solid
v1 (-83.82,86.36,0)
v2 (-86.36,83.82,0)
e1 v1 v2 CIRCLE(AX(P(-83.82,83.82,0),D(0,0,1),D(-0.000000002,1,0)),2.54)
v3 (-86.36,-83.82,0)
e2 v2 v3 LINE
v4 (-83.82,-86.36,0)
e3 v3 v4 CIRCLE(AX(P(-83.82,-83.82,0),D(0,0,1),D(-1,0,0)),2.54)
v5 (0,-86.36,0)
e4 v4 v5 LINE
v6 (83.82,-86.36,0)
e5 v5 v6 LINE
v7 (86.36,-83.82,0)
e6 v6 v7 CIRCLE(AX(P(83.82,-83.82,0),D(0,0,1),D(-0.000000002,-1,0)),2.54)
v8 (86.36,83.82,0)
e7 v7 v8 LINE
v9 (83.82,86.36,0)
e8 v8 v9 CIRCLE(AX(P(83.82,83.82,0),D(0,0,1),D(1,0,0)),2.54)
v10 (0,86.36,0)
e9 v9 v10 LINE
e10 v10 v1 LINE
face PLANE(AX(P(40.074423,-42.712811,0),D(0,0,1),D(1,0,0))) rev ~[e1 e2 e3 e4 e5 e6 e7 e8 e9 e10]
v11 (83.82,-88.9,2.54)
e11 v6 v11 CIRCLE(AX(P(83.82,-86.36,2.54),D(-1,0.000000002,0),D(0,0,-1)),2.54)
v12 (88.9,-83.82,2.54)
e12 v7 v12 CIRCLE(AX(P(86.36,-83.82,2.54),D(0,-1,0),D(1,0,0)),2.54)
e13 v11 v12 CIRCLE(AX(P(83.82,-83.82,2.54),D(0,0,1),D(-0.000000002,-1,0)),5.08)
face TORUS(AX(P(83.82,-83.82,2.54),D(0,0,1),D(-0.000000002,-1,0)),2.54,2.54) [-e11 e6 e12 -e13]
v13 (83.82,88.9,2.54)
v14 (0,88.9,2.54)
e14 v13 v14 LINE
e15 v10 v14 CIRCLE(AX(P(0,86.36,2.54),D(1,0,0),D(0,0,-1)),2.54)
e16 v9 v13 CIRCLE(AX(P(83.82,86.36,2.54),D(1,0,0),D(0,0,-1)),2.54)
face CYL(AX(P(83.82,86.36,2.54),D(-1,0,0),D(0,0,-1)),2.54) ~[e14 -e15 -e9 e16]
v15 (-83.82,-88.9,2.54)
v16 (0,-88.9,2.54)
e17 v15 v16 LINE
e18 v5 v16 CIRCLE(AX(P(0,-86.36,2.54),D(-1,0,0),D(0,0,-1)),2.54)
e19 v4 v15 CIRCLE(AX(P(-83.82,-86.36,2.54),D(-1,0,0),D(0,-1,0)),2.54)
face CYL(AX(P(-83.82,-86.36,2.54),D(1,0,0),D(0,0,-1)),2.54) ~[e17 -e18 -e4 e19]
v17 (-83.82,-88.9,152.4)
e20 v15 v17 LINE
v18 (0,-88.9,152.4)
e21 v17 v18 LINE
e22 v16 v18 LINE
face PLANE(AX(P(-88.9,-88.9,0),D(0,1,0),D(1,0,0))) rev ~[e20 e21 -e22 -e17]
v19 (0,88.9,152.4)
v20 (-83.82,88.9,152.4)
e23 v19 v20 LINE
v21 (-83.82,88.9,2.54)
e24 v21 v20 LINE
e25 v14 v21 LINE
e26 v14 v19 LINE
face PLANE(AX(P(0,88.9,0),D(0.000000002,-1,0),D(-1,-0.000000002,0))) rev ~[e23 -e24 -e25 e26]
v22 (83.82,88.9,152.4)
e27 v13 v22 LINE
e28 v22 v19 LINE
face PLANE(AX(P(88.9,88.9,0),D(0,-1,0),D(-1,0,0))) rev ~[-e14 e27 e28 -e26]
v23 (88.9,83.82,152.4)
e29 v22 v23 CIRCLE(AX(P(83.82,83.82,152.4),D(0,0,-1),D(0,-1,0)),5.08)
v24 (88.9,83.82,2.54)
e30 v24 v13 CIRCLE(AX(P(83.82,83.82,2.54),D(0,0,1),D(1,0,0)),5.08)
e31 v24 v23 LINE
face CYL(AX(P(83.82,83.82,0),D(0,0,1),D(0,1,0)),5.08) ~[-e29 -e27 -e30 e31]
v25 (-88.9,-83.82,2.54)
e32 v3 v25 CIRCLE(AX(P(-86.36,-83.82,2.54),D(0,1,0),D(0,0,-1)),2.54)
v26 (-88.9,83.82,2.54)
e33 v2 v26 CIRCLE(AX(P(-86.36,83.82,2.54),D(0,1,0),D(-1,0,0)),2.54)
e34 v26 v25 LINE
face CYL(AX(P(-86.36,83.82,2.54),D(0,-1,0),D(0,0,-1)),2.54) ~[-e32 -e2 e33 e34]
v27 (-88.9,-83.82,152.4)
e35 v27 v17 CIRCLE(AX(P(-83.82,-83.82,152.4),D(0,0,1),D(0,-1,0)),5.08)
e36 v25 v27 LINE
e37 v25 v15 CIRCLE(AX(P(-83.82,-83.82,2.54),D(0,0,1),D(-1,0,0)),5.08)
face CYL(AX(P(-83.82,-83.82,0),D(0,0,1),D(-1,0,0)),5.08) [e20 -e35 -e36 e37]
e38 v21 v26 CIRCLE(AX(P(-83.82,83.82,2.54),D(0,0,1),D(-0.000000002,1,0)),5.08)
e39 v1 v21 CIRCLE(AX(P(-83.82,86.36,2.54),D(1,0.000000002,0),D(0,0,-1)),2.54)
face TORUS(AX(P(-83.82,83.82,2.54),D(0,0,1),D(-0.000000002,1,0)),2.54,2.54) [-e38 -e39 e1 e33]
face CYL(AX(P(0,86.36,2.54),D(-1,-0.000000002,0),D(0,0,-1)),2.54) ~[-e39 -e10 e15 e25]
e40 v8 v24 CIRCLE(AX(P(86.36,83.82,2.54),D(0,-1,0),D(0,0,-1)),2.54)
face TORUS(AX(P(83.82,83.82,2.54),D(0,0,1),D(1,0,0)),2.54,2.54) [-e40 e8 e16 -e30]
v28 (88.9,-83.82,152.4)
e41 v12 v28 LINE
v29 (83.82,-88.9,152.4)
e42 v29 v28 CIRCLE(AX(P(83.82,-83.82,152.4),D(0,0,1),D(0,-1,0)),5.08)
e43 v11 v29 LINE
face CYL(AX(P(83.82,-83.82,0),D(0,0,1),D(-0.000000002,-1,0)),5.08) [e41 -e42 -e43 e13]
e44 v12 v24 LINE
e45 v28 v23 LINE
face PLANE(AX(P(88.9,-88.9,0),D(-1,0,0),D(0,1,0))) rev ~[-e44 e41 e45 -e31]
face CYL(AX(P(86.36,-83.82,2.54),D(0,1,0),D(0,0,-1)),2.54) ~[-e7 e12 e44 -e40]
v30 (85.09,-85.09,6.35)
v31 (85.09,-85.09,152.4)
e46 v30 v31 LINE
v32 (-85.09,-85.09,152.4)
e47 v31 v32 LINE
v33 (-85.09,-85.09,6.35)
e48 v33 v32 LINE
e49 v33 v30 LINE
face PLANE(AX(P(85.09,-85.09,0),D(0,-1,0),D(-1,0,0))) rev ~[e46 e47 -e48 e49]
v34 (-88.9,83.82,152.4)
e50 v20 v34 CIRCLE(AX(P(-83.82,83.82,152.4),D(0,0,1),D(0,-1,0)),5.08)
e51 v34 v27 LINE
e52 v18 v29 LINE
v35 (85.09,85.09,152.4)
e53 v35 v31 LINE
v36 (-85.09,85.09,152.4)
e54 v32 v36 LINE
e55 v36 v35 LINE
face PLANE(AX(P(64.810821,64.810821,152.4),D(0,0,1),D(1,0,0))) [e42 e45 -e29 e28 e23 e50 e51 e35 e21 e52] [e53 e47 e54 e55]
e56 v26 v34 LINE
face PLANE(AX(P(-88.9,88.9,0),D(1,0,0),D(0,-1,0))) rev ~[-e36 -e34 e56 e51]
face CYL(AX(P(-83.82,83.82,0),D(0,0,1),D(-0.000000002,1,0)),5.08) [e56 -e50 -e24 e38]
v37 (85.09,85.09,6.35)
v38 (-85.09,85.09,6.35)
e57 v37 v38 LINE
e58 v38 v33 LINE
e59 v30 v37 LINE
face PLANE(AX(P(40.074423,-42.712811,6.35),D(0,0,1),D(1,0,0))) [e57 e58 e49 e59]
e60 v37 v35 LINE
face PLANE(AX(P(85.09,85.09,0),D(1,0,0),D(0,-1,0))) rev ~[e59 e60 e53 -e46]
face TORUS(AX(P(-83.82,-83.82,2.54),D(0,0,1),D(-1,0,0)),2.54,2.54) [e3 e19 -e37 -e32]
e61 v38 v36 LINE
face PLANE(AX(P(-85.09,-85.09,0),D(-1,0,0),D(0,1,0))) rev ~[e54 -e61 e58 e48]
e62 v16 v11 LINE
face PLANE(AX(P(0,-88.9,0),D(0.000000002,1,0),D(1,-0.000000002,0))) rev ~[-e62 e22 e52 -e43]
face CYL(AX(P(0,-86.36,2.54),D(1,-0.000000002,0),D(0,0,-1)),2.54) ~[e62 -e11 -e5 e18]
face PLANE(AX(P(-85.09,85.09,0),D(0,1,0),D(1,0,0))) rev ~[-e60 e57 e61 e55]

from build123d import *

# Parameters (mm, degrees)
F1_DEPTH = 152.4
F2_DEPTH = 6.35
F4_R     = 5.08
F5_R     = 2.54


# Not quite as in the source:
# - ends of sketch curves that miss each other by under 0.0002 mm in the source are joined


with BuildPart() as f1:
    # F0 (on Top) → F1 (new body)
    with BuildSketch(Plane.XY):
        Polygon((88.9, 1.431e-07), (88.9, 88.9), (0, 88.9), (0, 85.09), (85.09, 85.09), (85.09, 1.431e-07), align=None)
        Polygon((0, 85.09), (0, 88.9000001431), (-88.9, 88.9), (-88.9, 1.431e-07), (-85.09, 1.431e-07), (-85.09, 85.09), align=None)
        Polygon((-85.09, 1.431e-07), (-88.9, 1.431e-07), (-88.9, -88.9), (0, -88.9), (0, -85.09), (-85.09, -85.09), align=None)
        Polygon((88.9, -88.9), (88.9, 1.431e-07), (85.09, 1.431e-07), (85.09, -85.09), (0, -85.09), (0, -88.8999998569), align=None)
    extrude(amount=F1_DEPTH)

    # F0 (on Top) → F2 (join)
    with BuildSketch(Plane.XY):
        Polygon((85.09, -85.09), (85.09, 1.431e-07), (57.15, 1.431e-07), (44.45, 1.431e-07), (31.75, 1.431e-07), (0, 1.431e-07), (0, -31.7499998569), (10.16, -26.6699998569), (10.16, -44.4499998569), (10.16, -62.2299998569), (0, -57.1499998569), (0, -85.09), align=None)
        Polygon((0, 57.1500001431), (0, 85.09), (-85.09, 85.09), (-85.09, 1.431e-07), (-57.15, 1.431e-07), (-44.45, 1.431e-07), (-31.75, 1.431e-07), (0, 1.431e-07), (0, 31.7500001431), (-10.16, 26.6700001431), (-10.16, 44.4500001431), (-10.16, 62.2300001431), align=None)
        Polygon((44.45, 1.431e-07), (57.15, 1.431e-07), (62.23, 10.1600001431), (44.45, 10.1600001431), align=None)
        Polygon((31.75, 1.431e-07), (44.45, 1.431e-07), (44.45, 10.1600001431), (26.67, 10.1600001431), align=None)
        Polygon((0, 31.7500001431), (0, 44.4500001431), (-10.16, 44.4500001431), (-10.16, 26.6700001431), align=None)
        Polygon((0, 44.4500001431), (0, 57.1500001431), (-10.16, 62.2300001431), (-10.16, 44.4500001431), align=None)
        Polygon((85.09, 85.09), (0, 85.09), (0, 57.1500001431), (0, 44.4500001431), (0, 31.7500001431), (0, 1.431e-07), (31.75, 1.431e-07), (26.67, 10.1600001431), (44.45, 10.1600001431), (62.23, 10.1600001431), (57.15, 1.431e-07), (85.09, 1.431e-07), align=None)
        Polygon((-57.15, 1.431e-07), (-85.09, 1.431e-07), (-85.09, -85.09), (0, -85.09), (0, -57.1499998569), (0, -44.4499998569), (0, -31.7499998569), (0, 1.431e-07), (-31.75, 1.431e-07), (-26.67, -10.1599998569), (-44.45, -10.1599998569), (-62.23, -10.1599998569), align=None)
        Polygon((0, -31.7499998569), (0, -44.4499998569), (10.16, -44.4499998569), (10.16, -26.6699998569), align=None)
        Polygon((0, -44.4499998569), (0, -57.1499998569), (10.16, -62.2299998569), (10.16, -44.4499998569), align=None)
        Polygon((-31.75, 1.431e-07), (-44.45, 1.431e-07), (-44.45, -10.1599998569), (-26.67, -10.1599998569), align=None)
        Polygon((-44.45, 1.431e-07), (-57.15, 1.431e-07), (-62.23, -10.1599998569), (-44.45, -10.1599998569), align=None)
    extrude(amount=F2_DEPTH)

    # F4
    f4_edges = [f1.edges().sort_by_distance(p)[0] for p in [
        (-88.9, 88.9, 76.2),
        (88.9, 88.9, 76.2),
        (88.9, -88.9, 76.2),
        (-88.9, -88.9, 76.2),
    ]]
    fillet(f4_edges, radius=F4_R)

    # F5
    f5_edges = [f1.edges().sort_by_distance(p)[0] for p in [
        (41.91, 88.9, 0),
        (87.412102, 87.412102, 0),
        (-41.91, 88.9, 0),
        (88.9, 0, 0),
        (-87.412102, 87.412102, 0),
        (87.412102, -87.412102, 0),
        (-88.9, 0, 0),
        (41.91, -88.9, 0),
        (-87.412102, -87.412102, 0),
        (-41.91, -88.9, 0),
    ]]
    fillet(f5_edges, radius=F5_R)


solid = f1.part
